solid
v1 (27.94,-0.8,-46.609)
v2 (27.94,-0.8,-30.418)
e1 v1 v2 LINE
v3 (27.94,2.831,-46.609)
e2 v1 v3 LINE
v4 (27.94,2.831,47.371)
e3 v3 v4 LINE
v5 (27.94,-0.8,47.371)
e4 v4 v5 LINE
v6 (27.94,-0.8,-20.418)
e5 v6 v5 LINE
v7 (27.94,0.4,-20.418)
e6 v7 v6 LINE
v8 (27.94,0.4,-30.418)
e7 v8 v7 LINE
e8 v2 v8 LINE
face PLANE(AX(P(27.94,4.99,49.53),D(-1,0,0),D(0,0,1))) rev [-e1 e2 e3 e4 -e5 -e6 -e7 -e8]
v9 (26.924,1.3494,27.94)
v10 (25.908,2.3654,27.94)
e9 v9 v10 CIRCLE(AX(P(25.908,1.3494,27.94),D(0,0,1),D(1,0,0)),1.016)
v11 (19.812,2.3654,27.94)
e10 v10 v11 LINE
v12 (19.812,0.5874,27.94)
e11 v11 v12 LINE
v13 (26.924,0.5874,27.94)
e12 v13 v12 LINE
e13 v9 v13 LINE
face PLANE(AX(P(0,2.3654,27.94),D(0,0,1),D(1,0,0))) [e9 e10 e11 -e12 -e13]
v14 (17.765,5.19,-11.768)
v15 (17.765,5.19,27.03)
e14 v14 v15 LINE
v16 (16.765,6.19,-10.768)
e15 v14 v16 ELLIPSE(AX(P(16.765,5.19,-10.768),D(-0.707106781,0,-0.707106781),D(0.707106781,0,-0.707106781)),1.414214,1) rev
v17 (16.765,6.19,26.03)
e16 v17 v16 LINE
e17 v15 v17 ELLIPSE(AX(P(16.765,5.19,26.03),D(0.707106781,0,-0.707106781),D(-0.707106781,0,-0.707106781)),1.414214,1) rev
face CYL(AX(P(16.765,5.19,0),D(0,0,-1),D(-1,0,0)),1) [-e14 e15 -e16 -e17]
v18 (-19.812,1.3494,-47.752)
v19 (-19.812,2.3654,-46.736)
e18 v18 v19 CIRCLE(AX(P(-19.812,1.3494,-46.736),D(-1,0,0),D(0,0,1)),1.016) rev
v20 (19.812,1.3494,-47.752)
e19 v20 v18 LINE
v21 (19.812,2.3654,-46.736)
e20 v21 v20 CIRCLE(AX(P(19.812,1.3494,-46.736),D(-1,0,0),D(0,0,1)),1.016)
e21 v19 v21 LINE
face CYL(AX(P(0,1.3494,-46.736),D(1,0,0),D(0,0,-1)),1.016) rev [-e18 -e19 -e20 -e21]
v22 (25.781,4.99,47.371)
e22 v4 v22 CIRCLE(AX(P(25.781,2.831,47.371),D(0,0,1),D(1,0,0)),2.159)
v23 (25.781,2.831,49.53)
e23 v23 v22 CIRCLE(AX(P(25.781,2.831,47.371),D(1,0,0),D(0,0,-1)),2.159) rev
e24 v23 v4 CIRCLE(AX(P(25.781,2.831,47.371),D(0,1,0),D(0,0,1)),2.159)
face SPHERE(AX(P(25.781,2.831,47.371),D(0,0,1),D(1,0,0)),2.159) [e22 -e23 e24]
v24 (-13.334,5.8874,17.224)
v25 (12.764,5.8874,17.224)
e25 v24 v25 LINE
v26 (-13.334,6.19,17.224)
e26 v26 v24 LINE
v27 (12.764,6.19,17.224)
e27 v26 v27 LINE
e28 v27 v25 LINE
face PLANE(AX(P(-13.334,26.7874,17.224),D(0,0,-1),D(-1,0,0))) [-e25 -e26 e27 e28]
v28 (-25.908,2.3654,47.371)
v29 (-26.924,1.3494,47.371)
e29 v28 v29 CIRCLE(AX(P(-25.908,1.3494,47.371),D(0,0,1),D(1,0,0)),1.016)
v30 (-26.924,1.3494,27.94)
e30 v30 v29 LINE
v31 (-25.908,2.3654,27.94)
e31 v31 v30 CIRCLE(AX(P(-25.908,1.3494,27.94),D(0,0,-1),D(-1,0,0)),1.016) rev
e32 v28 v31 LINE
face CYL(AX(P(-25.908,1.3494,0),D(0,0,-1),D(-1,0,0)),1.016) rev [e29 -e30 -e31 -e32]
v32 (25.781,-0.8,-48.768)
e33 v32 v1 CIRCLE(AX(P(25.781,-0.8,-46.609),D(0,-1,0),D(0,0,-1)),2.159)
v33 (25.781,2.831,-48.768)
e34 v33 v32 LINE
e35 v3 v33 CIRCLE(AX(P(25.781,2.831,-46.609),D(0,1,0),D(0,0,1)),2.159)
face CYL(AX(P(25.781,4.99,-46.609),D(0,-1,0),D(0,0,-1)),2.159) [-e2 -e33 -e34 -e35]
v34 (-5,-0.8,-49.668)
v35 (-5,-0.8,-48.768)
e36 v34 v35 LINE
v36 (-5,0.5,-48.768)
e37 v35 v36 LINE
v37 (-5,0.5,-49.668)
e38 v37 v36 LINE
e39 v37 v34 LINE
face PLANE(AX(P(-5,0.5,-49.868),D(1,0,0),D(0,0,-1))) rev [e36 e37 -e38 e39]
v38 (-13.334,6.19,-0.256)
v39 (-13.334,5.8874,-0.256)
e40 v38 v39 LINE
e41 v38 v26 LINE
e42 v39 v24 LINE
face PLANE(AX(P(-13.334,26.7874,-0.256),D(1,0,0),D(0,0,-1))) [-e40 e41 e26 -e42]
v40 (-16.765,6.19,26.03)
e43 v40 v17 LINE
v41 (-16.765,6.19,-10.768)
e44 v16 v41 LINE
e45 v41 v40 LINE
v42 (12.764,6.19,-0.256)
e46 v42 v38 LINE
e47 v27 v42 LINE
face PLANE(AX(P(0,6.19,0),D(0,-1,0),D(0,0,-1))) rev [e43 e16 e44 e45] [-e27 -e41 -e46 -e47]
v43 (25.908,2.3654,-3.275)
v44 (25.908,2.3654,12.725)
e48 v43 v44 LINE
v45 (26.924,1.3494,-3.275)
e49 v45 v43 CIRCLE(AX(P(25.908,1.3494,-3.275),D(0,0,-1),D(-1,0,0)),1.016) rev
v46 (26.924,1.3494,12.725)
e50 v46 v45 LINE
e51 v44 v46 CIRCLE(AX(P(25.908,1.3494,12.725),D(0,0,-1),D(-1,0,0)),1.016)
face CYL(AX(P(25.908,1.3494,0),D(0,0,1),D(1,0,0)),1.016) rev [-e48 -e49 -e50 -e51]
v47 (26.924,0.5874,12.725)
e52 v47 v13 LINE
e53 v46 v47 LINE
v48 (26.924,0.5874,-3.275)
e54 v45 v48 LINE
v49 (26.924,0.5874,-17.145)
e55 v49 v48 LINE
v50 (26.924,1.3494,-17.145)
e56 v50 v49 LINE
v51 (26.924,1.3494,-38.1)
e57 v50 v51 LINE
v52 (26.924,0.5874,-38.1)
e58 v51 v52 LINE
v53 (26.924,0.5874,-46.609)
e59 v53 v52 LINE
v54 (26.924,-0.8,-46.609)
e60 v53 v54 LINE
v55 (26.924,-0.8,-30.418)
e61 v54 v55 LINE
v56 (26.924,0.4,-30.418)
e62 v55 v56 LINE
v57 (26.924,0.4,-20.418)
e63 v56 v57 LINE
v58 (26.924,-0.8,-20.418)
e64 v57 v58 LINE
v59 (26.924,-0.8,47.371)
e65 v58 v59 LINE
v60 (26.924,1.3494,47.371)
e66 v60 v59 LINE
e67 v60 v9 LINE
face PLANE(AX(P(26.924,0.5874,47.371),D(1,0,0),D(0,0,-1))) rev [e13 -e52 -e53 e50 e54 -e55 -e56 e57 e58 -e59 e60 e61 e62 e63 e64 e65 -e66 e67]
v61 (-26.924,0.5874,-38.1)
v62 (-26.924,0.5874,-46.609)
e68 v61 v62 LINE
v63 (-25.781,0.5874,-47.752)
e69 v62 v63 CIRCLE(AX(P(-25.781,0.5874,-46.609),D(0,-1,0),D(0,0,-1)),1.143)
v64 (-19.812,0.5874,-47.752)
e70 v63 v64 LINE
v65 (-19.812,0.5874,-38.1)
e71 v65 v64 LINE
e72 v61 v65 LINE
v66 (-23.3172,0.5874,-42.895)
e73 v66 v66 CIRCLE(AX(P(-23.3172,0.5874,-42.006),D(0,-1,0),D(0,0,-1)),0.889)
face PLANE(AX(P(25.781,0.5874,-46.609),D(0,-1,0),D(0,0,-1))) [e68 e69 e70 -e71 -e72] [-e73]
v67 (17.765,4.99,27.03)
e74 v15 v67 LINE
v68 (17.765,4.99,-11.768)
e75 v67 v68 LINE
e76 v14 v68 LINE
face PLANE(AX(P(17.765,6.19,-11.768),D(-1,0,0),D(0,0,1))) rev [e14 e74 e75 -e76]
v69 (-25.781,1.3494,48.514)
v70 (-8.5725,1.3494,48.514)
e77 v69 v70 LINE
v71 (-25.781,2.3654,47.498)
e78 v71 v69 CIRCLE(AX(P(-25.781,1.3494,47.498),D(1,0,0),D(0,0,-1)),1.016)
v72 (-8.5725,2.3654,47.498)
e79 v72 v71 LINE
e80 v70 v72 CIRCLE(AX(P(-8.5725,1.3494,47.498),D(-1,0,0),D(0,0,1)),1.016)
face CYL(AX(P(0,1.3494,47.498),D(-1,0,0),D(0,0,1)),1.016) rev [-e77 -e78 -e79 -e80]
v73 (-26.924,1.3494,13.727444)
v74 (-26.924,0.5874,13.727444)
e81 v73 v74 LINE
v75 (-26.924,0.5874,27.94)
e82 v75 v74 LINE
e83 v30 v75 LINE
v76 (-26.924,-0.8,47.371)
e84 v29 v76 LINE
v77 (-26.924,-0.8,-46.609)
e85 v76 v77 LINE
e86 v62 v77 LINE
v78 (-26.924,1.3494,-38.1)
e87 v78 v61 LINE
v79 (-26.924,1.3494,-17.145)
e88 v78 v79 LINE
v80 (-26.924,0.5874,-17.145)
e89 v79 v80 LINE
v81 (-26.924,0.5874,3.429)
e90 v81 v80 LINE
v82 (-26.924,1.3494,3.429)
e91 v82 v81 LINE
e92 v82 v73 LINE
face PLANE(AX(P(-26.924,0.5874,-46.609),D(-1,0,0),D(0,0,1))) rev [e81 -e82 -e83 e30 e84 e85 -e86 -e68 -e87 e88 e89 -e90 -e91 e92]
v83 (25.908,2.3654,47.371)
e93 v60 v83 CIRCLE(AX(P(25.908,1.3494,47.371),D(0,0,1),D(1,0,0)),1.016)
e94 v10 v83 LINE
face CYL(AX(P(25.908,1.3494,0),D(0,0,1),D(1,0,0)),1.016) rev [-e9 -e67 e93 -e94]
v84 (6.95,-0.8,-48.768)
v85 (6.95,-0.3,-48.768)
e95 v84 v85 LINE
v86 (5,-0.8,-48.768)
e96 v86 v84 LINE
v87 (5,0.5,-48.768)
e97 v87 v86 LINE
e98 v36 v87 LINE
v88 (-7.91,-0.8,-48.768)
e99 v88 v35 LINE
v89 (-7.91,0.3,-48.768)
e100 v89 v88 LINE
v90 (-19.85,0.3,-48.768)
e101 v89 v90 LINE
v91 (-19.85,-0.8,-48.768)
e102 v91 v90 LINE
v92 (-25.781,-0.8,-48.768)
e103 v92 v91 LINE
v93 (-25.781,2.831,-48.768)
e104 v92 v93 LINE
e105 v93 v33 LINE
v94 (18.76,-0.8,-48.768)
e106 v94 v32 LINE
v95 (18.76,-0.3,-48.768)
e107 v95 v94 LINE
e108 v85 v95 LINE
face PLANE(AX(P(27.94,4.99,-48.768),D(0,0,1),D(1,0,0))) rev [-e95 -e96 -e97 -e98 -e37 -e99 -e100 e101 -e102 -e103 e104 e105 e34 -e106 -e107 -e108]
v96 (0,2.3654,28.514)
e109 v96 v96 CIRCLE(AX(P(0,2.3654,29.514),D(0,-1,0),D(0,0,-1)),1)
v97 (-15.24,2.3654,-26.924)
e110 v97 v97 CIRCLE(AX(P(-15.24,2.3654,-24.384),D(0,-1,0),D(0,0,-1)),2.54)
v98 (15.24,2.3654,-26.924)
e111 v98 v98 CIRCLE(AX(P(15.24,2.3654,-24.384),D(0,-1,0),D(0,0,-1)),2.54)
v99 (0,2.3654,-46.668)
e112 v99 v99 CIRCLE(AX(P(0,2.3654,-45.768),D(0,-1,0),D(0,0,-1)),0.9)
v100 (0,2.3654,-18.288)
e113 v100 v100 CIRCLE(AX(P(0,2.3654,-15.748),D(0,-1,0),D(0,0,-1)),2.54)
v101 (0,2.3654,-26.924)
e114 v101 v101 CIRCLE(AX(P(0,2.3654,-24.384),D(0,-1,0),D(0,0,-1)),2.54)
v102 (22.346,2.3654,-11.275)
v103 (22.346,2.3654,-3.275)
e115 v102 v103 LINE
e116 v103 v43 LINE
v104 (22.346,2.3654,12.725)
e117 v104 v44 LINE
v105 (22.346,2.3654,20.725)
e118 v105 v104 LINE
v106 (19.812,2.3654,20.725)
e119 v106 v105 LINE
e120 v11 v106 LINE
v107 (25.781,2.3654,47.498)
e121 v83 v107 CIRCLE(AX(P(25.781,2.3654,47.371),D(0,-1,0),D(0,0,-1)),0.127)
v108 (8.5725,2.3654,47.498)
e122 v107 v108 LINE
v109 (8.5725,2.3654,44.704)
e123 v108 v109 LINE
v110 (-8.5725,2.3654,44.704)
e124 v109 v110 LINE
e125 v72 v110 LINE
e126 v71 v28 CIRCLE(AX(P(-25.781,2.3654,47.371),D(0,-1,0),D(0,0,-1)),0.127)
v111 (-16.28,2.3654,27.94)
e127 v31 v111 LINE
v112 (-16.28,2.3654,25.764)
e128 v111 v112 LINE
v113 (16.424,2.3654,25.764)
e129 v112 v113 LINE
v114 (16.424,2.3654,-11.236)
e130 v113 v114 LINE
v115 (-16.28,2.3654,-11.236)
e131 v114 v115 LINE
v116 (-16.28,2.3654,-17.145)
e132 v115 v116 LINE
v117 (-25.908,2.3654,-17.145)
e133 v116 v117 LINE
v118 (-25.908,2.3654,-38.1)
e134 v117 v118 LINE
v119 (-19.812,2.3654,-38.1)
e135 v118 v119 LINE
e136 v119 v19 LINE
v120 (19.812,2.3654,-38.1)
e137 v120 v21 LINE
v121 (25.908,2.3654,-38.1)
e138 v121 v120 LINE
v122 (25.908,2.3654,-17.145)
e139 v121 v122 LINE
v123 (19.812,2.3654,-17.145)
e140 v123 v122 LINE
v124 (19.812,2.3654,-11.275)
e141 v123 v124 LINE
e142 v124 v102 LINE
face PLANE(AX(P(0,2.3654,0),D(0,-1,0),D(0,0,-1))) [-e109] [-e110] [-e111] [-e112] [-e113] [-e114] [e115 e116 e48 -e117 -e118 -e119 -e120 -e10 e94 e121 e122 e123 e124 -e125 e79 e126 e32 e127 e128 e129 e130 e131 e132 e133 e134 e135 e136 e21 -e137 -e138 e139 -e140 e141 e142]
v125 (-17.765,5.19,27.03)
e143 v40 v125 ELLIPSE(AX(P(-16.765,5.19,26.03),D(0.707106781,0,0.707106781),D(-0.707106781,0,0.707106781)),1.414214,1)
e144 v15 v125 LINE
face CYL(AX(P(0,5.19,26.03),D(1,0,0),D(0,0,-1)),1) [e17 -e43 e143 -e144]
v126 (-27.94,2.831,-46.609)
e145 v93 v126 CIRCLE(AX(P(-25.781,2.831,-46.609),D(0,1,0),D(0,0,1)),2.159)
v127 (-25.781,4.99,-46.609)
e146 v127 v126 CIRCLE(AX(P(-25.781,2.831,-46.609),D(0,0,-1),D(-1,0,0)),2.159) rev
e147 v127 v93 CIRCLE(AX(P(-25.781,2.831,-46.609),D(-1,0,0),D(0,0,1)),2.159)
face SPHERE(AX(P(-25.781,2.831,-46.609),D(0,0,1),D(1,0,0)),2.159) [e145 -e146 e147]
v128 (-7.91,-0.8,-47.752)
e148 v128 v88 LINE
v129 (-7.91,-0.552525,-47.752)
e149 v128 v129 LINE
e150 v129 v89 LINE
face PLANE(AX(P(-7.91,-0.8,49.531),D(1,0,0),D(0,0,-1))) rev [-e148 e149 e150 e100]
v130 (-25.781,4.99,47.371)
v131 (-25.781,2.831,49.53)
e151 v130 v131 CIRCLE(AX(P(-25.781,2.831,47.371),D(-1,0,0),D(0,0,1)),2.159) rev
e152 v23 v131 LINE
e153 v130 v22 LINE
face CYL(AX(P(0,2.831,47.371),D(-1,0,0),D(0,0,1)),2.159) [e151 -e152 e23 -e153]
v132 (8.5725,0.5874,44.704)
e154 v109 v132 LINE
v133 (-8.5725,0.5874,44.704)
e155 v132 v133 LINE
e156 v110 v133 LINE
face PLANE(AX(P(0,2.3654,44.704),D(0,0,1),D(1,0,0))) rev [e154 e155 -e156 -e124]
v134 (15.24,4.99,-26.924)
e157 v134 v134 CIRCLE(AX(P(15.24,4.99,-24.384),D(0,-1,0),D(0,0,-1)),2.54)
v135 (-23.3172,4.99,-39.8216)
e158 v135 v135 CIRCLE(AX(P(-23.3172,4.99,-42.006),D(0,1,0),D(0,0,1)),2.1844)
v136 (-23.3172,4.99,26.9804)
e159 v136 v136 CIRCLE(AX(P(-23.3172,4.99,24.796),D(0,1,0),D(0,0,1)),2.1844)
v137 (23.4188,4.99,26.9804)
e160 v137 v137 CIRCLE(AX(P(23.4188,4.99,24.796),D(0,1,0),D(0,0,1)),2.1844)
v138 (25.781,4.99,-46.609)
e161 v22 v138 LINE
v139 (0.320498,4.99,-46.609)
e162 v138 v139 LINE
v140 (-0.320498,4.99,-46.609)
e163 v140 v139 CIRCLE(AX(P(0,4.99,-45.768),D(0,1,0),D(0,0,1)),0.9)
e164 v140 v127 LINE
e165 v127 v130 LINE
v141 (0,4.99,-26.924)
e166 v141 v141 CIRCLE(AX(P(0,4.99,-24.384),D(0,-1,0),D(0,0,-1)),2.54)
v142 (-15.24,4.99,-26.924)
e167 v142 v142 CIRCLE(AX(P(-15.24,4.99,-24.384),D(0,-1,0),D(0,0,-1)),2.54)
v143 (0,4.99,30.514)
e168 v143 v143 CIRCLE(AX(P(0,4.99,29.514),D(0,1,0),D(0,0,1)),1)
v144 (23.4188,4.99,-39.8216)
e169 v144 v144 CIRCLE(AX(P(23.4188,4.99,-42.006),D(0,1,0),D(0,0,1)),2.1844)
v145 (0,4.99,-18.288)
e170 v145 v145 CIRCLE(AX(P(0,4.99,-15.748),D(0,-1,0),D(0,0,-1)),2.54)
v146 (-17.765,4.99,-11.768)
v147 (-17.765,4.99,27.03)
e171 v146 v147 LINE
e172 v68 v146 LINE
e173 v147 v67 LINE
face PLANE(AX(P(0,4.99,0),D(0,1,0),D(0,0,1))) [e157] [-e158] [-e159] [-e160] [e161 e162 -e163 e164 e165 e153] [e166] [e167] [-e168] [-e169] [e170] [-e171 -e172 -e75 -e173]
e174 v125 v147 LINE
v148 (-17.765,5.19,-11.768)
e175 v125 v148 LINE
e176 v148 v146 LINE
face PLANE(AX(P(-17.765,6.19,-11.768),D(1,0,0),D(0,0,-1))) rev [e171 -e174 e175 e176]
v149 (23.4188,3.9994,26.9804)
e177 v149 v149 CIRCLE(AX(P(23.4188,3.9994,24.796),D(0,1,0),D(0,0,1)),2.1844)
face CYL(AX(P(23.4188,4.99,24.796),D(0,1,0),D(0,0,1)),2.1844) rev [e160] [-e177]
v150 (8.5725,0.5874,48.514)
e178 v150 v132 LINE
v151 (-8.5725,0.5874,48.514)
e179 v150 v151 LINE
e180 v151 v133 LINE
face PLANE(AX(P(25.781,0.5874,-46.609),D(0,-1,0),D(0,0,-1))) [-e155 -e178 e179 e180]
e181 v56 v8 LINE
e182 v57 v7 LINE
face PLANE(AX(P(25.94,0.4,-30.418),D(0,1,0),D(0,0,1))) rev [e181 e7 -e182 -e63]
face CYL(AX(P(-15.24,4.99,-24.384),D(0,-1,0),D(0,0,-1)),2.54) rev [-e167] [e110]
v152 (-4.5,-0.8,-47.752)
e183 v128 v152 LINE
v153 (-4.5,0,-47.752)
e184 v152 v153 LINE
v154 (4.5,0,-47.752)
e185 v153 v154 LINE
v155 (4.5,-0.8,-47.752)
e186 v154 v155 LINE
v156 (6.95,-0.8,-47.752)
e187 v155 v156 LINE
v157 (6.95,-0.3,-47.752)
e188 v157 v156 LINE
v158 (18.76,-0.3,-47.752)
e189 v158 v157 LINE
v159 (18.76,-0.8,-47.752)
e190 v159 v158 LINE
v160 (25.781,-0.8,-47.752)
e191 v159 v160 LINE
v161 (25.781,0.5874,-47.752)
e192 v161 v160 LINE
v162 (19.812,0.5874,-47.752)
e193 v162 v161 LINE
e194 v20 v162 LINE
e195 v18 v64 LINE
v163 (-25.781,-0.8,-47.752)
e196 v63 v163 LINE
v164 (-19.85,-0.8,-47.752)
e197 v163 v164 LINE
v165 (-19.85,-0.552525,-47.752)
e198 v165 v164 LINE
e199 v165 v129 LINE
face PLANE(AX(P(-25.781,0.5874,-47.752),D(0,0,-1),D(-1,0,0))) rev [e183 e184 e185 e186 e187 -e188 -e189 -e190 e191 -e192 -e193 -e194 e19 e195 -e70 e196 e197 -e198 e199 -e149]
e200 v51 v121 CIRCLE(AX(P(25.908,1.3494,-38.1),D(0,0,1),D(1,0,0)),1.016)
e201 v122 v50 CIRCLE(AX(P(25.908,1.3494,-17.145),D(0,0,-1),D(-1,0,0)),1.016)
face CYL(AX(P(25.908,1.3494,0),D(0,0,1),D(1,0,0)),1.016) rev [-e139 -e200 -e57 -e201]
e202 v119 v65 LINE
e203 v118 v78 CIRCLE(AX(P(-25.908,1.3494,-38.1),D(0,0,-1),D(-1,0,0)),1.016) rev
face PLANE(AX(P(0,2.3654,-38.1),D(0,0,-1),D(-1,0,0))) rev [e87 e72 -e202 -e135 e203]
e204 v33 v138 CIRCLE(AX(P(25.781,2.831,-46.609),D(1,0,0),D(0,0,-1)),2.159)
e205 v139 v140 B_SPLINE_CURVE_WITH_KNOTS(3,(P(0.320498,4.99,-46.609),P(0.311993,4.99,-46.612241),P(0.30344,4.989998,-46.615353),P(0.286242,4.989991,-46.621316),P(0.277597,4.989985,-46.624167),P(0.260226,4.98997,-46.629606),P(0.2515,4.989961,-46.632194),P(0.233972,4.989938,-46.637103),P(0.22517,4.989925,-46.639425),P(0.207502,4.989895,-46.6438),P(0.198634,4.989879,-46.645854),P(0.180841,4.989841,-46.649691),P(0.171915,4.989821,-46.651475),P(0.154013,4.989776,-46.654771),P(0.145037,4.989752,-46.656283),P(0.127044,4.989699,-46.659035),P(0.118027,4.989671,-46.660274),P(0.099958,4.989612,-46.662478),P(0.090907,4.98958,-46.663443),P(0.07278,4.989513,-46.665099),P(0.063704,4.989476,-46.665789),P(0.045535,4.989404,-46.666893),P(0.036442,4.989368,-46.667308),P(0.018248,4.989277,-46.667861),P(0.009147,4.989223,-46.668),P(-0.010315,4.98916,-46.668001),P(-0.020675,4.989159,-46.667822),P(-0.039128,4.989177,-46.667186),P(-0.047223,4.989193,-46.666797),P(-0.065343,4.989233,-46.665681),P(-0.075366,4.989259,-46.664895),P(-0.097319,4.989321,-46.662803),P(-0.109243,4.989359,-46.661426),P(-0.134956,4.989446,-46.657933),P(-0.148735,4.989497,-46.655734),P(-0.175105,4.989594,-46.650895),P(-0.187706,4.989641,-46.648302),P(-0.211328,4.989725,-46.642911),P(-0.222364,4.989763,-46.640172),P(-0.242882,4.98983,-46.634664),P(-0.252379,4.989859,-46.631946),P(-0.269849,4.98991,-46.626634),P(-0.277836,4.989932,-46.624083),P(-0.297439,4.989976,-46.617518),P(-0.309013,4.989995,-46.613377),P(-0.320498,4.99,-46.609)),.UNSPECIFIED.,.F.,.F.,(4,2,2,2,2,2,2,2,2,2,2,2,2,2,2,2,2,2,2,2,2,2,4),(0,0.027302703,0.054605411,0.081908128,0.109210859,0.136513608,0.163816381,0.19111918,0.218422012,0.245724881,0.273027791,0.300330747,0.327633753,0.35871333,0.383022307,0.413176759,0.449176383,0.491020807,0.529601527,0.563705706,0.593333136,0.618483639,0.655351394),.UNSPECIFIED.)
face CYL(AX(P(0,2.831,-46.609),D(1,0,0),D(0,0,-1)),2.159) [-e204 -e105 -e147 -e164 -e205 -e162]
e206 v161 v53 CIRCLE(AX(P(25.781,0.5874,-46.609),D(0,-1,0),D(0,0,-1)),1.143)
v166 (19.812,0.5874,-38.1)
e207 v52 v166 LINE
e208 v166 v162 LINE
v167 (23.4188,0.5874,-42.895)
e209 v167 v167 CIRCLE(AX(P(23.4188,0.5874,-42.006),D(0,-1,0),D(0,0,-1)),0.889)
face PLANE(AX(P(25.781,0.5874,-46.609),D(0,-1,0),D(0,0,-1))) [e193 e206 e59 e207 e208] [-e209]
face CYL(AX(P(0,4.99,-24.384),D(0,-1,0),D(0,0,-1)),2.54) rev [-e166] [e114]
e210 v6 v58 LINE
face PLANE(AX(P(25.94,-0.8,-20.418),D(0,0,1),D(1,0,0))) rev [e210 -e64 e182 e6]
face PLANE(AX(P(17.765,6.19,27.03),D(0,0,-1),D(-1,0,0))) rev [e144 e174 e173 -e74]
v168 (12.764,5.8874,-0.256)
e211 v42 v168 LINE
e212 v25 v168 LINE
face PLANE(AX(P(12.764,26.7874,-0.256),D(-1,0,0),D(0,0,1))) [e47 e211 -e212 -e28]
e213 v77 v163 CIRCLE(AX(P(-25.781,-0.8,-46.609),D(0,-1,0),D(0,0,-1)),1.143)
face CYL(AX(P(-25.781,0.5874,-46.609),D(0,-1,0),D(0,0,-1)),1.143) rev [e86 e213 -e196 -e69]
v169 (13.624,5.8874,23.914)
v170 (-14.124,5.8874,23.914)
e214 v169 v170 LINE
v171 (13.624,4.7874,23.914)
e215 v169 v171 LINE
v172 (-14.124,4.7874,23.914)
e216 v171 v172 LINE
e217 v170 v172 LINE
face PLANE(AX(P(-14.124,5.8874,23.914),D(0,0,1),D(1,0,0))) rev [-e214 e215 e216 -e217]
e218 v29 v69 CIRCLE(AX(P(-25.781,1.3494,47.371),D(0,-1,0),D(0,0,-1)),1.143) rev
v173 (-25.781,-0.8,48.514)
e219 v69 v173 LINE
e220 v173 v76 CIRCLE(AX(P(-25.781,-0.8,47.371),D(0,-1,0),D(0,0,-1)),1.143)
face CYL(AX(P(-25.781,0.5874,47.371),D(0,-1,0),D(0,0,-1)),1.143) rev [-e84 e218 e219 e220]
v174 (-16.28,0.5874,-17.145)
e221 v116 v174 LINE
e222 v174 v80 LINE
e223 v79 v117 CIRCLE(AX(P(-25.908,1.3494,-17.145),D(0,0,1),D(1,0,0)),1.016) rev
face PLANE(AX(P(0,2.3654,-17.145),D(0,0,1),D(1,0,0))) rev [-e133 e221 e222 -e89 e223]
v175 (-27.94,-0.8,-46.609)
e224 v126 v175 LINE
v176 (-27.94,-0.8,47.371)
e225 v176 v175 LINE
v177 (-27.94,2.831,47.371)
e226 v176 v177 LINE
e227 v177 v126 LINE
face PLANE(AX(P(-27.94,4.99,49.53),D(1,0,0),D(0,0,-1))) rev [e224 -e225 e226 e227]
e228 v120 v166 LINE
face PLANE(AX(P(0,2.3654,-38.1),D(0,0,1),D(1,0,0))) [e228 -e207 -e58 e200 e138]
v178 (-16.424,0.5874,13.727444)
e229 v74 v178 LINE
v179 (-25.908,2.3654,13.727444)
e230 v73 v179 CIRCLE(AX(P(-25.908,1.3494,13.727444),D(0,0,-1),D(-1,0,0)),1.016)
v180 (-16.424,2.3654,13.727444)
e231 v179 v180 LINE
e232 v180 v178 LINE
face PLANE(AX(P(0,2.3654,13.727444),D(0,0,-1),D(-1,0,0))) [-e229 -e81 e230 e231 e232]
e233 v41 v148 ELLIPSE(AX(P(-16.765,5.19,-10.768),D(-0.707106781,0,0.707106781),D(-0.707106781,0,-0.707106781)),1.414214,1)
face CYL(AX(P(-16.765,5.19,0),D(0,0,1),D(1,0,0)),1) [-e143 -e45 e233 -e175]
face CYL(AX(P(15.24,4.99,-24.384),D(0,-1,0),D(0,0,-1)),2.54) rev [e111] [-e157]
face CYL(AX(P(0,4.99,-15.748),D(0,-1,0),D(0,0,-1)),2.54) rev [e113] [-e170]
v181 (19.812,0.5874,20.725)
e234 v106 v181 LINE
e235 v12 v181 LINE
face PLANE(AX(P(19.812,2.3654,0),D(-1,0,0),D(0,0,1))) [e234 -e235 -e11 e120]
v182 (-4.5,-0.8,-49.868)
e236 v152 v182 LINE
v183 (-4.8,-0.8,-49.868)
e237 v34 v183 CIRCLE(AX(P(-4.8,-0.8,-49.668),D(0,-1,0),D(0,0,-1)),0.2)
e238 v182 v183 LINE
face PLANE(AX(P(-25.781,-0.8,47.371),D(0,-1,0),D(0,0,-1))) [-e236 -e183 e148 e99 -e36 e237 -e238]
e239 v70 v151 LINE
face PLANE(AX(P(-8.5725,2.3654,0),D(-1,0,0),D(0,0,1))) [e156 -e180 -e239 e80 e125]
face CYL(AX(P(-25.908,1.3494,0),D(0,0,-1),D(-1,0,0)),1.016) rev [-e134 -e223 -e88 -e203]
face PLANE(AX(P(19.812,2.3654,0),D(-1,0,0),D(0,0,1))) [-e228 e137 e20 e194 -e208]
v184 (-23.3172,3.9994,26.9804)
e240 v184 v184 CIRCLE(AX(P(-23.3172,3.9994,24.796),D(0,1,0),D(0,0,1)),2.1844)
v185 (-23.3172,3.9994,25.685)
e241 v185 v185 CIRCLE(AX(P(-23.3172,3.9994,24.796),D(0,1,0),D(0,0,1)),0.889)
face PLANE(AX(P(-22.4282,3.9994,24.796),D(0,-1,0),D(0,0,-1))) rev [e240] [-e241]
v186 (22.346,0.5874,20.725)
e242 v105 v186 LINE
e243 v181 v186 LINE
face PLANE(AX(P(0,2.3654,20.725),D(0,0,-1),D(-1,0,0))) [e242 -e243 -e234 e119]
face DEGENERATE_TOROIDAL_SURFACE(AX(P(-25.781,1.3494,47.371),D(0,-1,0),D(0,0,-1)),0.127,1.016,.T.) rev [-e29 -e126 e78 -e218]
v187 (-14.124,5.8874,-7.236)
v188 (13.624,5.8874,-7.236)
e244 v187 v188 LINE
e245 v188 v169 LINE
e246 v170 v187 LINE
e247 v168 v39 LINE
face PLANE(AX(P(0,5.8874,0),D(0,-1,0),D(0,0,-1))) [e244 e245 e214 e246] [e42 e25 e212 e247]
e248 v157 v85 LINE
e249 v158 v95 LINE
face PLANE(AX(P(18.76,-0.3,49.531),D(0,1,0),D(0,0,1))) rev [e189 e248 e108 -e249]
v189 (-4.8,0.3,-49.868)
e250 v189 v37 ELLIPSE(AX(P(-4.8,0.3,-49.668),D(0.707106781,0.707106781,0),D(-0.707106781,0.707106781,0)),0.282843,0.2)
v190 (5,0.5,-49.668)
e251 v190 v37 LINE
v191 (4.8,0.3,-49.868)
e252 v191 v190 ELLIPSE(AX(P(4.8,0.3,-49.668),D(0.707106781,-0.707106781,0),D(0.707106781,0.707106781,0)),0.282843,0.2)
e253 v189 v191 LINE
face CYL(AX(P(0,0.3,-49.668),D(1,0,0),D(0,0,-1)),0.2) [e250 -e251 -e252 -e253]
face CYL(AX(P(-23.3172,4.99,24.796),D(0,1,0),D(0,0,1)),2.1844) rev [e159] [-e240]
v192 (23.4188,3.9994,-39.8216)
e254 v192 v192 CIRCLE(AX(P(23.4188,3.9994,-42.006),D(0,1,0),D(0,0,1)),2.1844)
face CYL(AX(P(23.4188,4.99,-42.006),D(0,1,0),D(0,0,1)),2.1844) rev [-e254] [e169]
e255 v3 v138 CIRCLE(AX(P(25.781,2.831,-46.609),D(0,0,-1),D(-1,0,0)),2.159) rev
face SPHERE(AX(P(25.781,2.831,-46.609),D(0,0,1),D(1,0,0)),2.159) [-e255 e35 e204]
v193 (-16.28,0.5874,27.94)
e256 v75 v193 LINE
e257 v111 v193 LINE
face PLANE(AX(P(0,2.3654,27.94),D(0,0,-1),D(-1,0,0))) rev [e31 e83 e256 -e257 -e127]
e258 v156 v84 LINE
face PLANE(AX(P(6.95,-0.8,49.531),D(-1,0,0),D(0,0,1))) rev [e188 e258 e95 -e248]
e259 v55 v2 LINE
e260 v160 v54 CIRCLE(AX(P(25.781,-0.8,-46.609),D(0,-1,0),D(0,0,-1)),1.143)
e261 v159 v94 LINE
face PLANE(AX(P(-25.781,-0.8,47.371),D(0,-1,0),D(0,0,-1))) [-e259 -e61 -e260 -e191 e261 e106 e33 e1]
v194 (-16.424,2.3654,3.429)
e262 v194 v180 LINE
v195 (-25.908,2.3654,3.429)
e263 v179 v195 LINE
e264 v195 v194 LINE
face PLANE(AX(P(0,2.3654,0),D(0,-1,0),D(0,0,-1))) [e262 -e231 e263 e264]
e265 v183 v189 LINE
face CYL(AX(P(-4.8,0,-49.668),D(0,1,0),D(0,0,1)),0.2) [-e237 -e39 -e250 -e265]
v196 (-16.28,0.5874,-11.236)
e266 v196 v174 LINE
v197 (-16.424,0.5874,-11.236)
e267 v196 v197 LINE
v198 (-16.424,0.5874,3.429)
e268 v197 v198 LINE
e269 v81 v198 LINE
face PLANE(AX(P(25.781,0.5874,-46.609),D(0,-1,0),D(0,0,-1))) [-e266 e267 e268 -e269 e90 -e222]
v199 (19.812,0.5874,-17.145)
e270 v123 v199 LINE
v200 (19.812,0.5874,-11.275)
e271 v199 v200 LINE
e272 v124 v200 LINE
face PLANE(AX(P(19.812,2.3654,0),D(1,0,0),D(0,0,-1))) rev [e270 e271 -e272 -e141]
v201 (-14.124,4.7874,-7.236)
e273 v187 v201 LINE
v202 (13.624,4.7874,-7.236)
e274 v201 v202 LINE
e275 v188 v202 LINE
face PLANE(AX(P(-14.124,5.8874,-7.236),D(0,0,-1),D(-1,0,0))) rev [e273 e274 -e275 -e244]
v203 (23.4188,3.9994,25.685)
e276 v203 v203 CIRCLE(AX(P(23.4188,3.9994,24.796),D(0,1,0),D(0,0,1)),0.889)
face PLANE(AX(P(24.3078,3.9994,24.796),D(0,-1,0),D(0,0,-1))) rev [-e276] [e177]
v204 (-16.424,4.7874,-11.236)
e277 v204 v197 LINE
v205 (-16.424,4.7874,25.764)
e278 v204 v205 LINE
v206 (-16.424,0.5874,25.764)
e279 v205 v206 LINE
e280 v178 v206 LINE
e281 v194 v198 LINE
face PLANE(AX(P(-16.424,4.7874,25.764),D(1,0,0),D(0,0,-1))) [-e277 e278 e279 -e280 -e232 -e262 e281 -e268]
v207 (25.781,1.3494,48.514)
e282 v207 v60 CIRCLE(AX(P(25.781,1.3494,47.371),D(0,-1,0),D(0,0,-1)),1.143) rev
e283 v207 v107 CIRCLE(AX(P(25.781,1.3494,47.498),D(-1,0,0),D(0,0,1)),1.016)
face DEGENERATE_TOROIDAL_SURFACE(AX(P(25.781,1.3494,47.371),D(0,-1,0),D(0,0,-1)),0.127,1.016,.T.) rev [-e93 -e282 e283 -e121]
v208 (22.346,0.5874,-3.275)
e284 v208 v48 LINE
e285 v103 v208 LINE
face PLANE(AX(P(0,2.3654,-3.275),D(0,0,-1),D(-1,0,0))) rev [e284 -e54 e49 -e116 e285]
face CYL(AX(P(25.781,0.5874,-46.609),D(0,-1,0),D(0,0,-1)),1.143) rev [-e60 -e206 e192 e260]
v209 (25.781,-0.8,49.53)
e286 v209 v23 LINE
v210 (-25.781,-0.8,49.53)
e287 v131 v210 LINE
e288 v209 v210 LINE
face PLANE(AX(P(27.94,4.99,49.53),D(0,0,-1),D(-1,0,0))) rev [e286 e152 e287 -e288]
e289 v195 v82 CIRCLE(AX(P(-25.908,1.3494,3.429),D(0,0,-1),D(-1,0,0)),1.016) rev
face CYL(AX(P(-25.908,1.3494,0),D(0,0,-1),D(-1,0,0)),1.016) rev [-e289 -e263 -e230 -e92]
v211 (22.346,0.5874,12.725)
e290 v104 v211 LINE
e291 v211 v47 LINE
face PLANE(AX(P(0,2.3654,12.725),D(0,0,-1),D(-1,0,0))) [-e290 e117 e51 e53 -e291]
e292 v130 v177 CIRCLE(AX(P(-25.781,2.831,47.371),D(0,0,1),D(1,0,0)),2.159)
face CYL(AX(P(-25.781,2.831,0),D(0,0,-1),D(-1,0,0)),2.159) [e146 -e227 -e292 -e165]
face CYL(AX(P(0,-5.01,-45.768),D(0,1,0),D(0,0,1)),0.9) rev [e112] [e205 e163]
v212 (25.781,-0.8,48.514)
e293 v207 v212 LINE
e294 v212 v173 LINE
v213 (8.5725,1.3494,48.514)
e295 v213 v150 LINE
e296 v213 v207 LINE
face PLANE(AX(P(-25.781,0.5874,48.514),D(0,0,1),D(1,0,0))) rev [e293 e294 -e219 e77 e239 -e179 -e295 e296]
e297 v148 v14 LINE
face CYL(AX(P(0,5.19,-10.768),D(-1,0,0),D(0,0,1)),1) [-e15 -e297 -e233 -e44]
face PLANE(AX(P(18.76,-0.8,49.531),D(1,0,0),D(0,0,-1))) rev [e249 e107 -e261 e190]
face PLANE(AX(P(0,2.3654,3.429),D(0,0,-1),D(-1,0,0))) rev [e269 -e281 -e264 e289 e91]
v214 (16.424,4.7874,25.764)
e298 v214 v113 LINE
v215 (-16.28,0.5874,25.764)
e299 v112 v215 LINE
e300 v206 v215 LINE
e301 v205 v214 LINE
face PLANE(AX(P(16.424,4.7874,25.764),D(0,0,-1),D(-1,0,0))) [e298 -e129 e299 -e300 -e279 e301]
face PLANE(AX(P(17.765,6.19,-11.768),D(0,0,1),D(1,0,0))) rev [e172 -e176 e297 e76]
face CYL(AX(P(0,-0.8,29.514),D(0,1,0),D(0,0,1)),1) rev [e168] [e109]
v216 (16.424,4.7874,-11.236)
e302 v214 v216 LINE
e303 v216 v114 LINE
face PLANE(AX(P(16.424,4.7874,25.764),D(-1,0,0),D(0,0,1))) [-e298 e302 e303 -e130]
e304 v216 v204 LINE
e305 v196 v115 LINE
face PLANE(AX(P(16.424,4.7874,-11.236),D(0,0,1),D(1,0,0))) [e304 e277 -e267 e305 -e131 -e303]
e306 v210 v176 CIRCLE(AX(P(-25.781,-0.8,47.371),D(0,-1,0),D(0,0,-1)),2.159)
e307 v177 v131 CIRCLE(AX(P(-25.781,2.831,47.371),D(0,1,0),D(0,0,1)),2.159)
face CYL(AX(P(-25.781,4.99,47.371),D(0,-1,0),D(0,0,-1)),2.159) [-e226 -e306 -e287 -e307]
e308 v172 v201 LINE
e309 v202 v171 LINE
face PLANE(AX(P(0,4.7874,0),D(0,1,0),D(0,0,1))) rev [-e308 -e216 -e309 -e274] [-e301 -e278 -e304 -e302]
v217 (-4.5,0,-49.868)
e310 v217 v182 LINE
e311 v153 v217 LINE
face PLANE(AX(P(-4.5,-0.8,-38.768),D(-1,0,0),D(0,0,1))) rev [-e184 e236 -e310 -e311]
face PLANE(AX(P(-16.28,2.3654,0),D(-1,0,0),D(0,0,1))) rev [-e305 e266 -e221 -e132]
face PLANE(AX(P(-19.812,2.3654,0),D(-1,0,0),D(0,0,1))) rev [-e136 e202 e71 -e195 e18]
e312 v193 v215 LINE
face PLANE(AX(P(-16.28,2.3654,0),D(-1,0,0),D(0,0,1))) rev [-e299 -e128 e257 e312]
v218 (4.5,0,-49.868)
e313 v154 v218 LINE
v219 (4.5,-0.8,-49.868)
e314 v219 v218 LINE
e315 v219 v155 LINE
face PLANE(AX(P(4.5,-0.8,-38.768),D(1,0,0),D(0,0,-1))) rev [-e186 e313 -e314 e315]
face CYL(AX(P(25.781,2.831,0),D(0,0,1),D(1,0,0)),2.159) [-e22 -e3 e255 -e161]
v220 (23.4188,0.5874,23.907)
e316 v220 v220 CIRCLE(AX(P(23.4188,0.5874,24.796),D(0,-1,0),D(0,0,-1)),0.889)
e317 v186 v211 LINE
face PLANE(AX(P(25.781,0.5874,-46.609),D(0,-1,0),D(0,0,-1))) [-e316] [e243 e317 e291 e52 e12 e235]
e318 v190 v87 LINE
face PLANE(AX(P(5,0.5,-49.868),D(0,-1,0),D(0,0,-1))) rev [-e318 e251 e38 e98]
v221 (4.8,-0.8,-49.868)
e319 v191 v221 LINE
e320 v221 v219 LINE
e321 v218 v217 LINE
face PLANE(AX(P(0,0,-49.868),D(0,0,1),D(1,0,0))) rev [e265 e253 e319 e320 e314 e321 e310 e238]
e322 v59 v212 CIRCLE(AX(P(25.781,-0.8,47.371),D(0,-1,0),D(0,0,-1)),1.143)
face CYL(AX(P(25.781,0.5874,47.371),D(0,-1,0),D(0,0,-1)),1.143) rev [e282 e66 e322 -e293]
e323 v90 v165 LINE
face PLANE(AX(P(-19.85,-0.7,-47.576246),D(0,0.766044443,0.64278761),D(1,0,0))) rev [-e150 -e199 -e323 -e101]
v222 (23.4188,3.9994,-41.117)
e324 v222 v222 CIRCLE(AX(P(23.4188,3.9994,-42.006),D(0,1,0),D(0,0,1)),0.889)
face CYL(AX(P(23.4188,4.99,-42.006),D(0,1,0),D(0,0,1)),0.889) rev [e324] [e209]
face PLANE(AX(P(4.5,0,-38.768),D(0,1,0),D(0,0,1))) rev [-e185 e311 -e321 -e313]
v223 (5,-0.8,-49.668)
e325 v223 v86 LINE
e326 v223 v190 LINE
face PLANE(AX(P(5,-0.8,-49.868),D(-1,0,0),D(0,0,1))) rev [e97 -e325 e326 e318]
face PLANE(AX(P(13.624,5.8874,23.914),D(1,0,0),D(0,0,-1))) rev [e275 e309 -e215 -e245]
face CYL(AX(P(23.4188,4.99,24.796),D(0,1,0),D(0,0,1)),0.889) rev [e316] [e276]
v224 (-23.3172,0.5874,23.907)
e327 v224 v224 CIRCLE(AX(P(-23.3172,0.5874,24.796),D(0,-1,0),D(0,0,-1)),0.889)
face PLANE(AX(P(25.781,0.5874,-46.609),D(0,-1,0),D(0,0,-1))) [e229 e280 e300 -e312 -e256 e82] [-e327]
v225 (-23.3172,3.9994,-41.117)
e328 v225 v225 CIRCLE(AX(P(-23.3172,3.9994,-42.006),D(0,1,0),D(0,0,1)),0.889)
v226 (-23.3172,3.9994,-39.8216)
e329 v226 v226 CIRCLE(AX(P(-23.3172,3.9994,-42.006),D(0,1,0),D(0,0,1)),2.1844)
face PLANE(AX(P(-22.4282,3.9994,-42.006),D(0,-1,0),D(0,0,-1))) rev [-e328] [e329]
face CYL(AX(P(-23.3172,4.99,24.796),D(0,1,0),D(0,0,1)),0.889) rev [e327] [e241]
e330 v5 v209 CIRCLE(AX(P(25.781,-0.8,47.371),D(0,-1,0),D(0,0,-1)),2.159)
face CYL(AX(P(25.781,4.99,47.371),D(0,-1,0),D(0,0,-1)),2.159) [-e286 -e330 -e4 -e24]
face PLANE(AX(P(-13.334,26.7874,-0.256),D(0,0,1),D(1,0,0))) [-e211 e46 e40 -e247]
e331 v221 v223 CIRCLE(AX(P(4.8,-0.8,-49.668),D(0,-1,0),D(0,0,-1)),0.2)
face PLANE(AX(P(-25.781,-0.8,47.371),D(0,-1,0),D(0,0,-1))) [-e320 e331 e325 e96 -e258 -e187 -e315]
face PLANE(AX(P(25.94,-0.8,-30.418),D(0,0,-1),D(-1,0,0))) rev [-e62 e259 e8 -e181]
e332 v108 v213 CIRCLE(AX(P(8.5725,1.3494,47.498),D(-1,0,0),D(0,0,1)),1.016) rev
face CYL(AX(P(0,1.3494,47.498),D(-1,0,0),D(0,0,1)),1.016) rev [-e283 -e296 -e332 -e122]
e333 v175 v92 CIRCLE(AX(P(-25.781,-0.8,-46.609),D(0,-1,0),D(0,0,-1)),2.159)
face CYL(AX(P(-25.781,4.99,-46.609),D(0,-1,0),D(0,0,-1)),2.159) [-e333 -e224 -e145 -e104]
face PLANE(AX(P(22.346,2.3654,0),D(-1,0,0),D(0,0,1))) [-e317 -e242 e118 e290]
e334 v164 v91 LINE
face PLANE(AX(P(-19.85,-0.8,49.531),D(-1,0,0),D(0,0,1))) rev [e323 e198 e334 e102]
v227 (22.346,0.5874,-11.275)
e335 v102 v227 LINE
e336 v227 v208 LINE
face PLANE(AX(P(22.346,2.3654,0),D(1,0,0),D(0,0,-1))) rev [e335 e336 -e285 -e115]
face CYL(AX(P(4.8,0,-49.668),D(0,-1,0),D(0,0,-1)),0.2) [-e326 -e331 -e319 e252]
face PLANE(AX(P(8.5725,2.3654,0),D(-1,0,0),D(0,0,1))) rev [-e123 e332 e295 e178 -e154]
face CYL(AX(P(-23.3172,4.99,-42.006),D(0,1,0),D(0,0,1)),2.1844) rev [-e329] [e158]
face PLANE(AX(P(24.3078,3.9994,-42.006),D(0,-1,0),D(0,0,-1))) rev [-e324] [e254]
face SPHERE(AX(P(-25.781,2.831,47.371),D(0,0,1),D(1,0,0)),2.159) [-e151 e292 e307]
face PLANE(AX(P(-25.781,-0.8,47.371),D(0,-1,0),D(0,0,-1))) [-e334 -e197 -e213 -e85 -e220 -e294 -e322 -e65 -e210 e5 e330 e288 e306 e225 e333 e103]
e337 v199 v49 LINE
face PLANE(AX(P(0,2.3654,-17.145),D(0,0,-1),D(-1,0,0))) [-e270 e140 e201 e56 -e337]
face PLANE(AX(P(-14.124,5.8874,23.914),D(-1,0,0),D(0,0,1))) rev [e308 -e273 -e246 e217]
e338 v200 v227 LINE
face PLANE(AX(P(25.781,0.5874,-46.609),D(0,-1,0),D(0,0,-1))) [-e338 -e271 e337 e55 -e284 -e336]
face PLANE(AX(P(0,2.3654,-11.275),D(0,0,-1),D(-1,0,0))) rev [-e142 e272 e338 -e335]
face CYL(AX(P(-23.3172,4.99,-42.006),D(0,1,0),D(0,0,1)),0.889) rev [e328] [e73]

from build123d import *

# Parameters (mm, degrees)
SKETCH1_W                                        = 55.88
SKETCH1_H                                        = 98.298
BOSS_EXTRUDE1_DEPTH                              = 4.99
FILLET1_R                                        = 2.159
CUT_EXTRUDE4_DEPTH                               = 0.5874
CUT_EXTRUDE5_DEPTH                               = 1.778
FILLET4_R                                        = 1.016
CHAMBRAGE_POUR_VIS_T_TE_RONDE_6_PANS_D           = 1.778
CHAMBRAGE_POUR_VIS_T_TE_RONDE_6_PANS_DEPTH       = 6
CHAMBRAGE_POUR_VIS_T_TE_RONDE_6_PANS_CBORE_D     = 4.3688
CHAMBRAGE_POUR_VIS_T_TE_RONDE_6_PANS_CBORE_DEPTH = 0.9906
CHAMBRAGE_POUR_VIS_T_TE_RONDE_6_PANS_TIP         = 0.53416509
SKETCH15_R                                       = 2.54
CUT_EXTRUDE6_DEPTH                               = 57.927612151
SKETCH16_W                                       = 32.848
SKETCH16_H                                       = 37
CUT_EXTRUDE7_DEPTH                               = 4.2
BOSS_EXTRUDE2_DEPTH                              = 0.8
ESQUISSE19_W                                     = 35.53
ESQUISSE19_H                                     = 38.798
BOSS_EXTRU_2_DEPTH                               = 1.2
ESQUISSE1_R                                      = 1
ENL_V_MAT_EXTRU_1_DEPTH                          = 58.161075917
ESQUISSE5_W                                      = 10
ESQUISSE5_H                                      = 1.2
ENL_V_MAT_EXTRU_3_DEPTH                          = 2
ESQUISSE13_W                                     = 27.748
ESQUISSE13_H                                     = 31.15
ENL_V_MAT_EXTRU_6_DEPTH                          = 1.1
ESQUISSE14_R                                     = 0.9
ENL_V_MAT_EXTRU_7_DEPTH                          = 10
ENL_V_MAT_EXTRU_8_REACH                          = 104.379
ESQUISSE15_W                                     = 11.94
ESQUISSE15_H                                     = 0.1
CHANFREIN1_SIZE                                  = 1
CHANFREIN1_SIZE_2                                = 1.191753593
ENL_V_MAT_EXTRU_9_REACH                          = 104.379
ESQUISSE16_W                                     = 11.81
ESQUISSE16_H                                     = 0.5
ESQUISSE17_W                                     = 9
ESQUISSE17_H                                     = 0.8
ENL_V_MAT_EXTRU_10_DEPTH                         = 10
BOSS_EXTRU_1_DEPTH                               = 1.1
CONG_1_R                                         = 0.2
ESQUISSE12_W                                     = 26.098
ESQUISSE12_H                                     = 17.48
ENL_V_MAT_EXTRU_5_DEPTH                          = 22
CONG_2_R                                         = 1


with BuildPart() as part:
    # Sketch1 → Boss-Extrude1 (new body)
    with BuildSketch(Plane(origin=(0, 0, 0), x_dir=(1, 0, 0), z_dir=(0, 1, 0))):
        with Locations((0, -0.381)):
            Rectangle(SKETCH1_W, SKETCH1_H)
    extrude(amount=BOSS_EXTRUDE1_DEPTH)

    # Fillet1
    fillet1_edges = [part.edges().sort_by_distance(p)[0] for p in [
        (27.94, 4.99, 0.381),
        (0, 4.99, -48.768),
        (-27.94, 4.99, 0.381),
        (0, 4.99, 49.53),
        (-27.94, 2.495, -48.768),
        (27.94, 2.495, -48.768),
        (27.94, 2.495, 49.53),
        (-27.94, 2.495, 49.53),
    ]]
    fillet(fillet1_edges, radius=FILLET1_R)

    # Sketch7 → Cut-Extrude4 (cut)
    with BuildSketch(Plane.XZ):
        with BuildLine():
            Line((-25.781, -47.752), (25.781, -47.752))
            ThreePointArc((25.781, -47.752), (26.589223051, -47.417223051), (26.924, -46.609))
            Line((26.924, -46.609), (26.924, 47.371))
            ThreePointArc((26.924, 47.371), (26.589223051, 48.179223051), (25.781, 48.514))
            Line((25.781, 48.514), (-25.781, 48.514))
            ThreePointArc((-25.781, 48.514), (-26.589223051, 48.179223051), (-26.924, 47.371))
            Line((-26.924, 47.371), (-26.924, -46.609))
            ThreePointArc((-26.924, -46.609), (-26.589223051, -47.417223051), (-25.781, -47.752))
        make_face()
    extrude(amount=-CUT_EXTRUDE4_DEPTH, mode=Mode.SUBTRACT)

    # Sketch12 → Cut-Extrude5 (cut)
    with BuildSketch(Plane.XZ.offset(-0.5874)):
        with BuildLine():
            Line((19.812, -38.1), (26.924, -38.1))
            Line((26.924, -38.1), (26.924, -17.145))
            Line((26.924, -17.145), (19.812, -17.145))
            Line((19.812, -17.145), (19.812, -11.275000024))
            Line((19.812, -11.275000024), (22.346000012, -11.275000024))
            Line((22.346000012, -11.275000024), (22.346000012, -3.275))
            Line((22.346000012, -3.275), (26.924, -3.275))
            Line((26.924, -3.275), (26.924, 12.725))
            Line((26.924, 12.725), (22.346000012, 12.725))
            Line((22.346000012, 12.725), (22.346000012, 20.725))
            Line((22.346000012, 20.725), (19.812, 20.725))
            Line((19.812, 20.725), (19.812, 27.94))
            Line((19.812, 27.94), (26.924, 27.94))
            Line((26.924, 27.94), (26.924, 47.371))
            ThreePointArc((26.924, 47.371), (26.589223051, 48.179223051), (25.781, 48.514))
            Line((25.781, 48.514), (8.5725, 48.514))
            Line((8.5725, 48.514), (8.5725, 44.704))
            Line((8.5725, 44.704), (-8.5725, 44.704))
            Line((-8.5725, 44.704), (-8.5725, 48.514))
            Line((-8.5725, 48.514), (-25.781, 48.514))
            ThreePointArc((-25.781, 48.514), (-26.589223051, 48.179223051), (-26.924, 47.371))
            Line((-26.924, 47.371), (-26.924, 27.94))
            Line((-26.924, 27.94), (-16.28, 27.94))
            Line((-16.28, 27.94), (-16.28, 13.727444148))
            Line((-16.28, 13.727444148), (-26.924, 13.727444148))
            Line((-26.924, 13.727444148), (-26.924, 3.429))
            Line((-26.924, 3.429), (-16.28, 3.429))
            Line((-16.28, 3.429), (-16.28, -17.145))
            Line((-16.28, -17.145), (-26.924, -17.145))
            Line((-26.924, -17.145), (-26.924, -38.1))
            Line((-26.924, -38.1), (-19.812, -38.1))
            Line((-19.812, -38.1), (-19.812, -47.752))
            Line((-19.812, -47.752), (19.812, -47.752))
            Line((19.812, -47.752), (19.812, -38.1))
        make_face()
    extrude(amount=-CUT_EXTRUDE5_DEPTH, mode=Mode.SUBTRACT)

    # Fillet4
    fillet4_edges = [part.edges().sort_by_distance(p)[0] for p in [
        (17.17675, 2.3654, 48.514),
        (26.589223051, 2.3654, 48.179223051),
        (26.924, 2.3654, 37.6555),
        (26.924, 2.3654, 4.725),
        (26.924, 2.3654, -27.6225),
        (0, 2.3654, -47.752),
        (-26.924, 2.3654, -27.6225),
        (-26.924, 2.3654, 8.578222074),
        (-26.924, 2.3654, 37.6555),
        (-26.589223051, 2.3654, 48.179223051),
        (-17.17675, 2.3654, 48.514),
    ]]
    fillet(fillet4_edges, radius=FILLET4_R)

    # Chambrage pour vis à tête ronde à 6 pans creux #11
    with Locations(Plane(origin=(0, 4.99, 0), x_dir=(1, 0, 0), z_dir=(0, 1, 0))):
        with Locations((-23.3172, -24.79600016), (23.4188, -24.79600016), (23.4188, 42.00599984), (-23.3172, 42.00599984)):
            CounterBoreHole(CHAMBRAGE_POUR_VIS_T_TE_RONDE_6_PANS_D / 2, CHAMBRAGE_POUR_VIS_T_TE_RONDE_6_PANS_CBORE_D / 2, CHAMBRAGE_POUR_VIS_T_TE_RONDE_6_PANS_CBORE_DEPTH, depth=CHAMBRAGE_POUR_VIS_T_TE_RONDE_6_PANS_DEPTH)
            with Locations((0, 0, -(CHAMBRAGE_POUR_VIS_T_TE_RONDE_6_PANS_DEPTH + CHAMBRAGE_POUR_VIS_T_TE_RONDE_6_PANS_TIP / 2))):  # 118° drill point
                Cone(0, CHAMBRAGE_POUR_VIS_T_TE_RONDE_6_PANS_D / 2, CHAMBRAGE_POUR_VIS_T_TE_RONDE_6_PANS_TIP, mode=Mode.SUBTRACT)

    # Sketch15 → Cut-Extrude6 (cut, through all)
    with BuildSketch(Plane.XZ.offset(-2.3654)):
        with Locations(Location((0, -24.384, 0), (0, 0, 270))):
            Circle(SKETCH15_R)
        with Locations(Location((-15.24, -24.384, 0), (0, 0, 270))):
            Circle(SKETCH15_R)
        with Locations(Location((15.24, -24.384, 0), (0, 0, 270))):
            Circle(SKETCH15_R)
        with Locations(Location((0, -15.748, 0), (0, 0, 270))):
            Circle(SKETCH15_R)
    extrude(amount=-CUT_EXTRUDE6_DEPTH, mode=Mode.SUBTRACT)

    # Sketch16 → Cut-Extrude7 (cut)
    with BuildSketch(Plane(origin=(0, 0.5874, 0), x_dir=(1, 0, 0), z_dir=(0, 1, 0))):
        with Locations((0, -7.264)):
            Rectangle(SKETCH16_W, SKETCH16_H)
    extrude(amount=CUT_EXTRUDE7_DEPTH, mode=Mode.SUBTRACT)

    # Sketch17 → Boss-Extrude2 (add)
    with BuildSketch(Plane.XZ):
        with BuildLine():
            Line((-27.94, 47.371), (-27.94, -46.609))
            ThreePointArc((-27.94, -46.609), (-27.307643541, -48.135643541), (-25.781, -48.768))
            Line((-25.781, -48.768), (25.781, -48.768))
            ThreePointArc((25.781, -48.768), (27.307643541, -48.135643541), (27.94, -46.609))
            Line((27.94, -46.609), (27.94, 47.371))
            ThreePointArc((27.94, 47.371), (27.307643541, 48.897643541), (25.781, 49.53))
            Line((25.781, 49.53), (-25.781, 49.53))
            ThreePointArc((-25.781, 49.53), (-27.307643541, 48.897643541), (-27.94, 47.371))
        make_face()
        with BuildLine():
            Line((-25.781, -47.752), (25.781, -47.752))
            ThreePointArc((25.781, -47.752), (26.589223051, -47.417223051), (26.924, -46.609))
            Line((26.924, -46.609), (26.924, 47.371))
            ThreePointArc((26.924, 47.371), (26.589223051, 48.179223051), (25.781, 48.514))
            Line((25.781, 48.514), (-25.781, 48.514))
            ThreePointArc((-25.781, 48.514), (-26.589223051, 48.179223051), (-26.924, 47.371))
            Line((-26.924, 47.371), (-26.924, -46.609))
            ThreePointArc((-26.924, -46.609), (-26.589223051, -47.417223051), (-25.781, -47.752))
        make_face(mode=Mode.SUBTRACT)
    extrude(amount=BOSS_EXTRUDE2_DEPTH)

    # Esquisse19 → Boss.-Extru.2 (add)
    with BuildSketch(Plane(origin=(0, 4.99, 0), x_dir=(1, 0, 0), z_dir=(0, 1, 0))):
        with Locations((0, -7.631)):
            Rectangle(ESQUISSE19_W, ESQUISSE19_H)
    extrude(amount=BOSS_EXTRU_2_DEPTH)

    # Esquisse1 → Enlèv. mat.-Extru.1 (cut, through all)
    with BuildSketch(Plane(origin=(0, 4.99, 0), x_dir=(1, 0, 0), z_dir=(0, 1, 0))):
        with Locations(Location((0, -29.514, 0), (0, 0, 270))):
            Circle(ESQUISSE1_R)
    extrude(amount=-ENL_V_MAT_EXTRU_1_DEPTH, mode=Mode.SUBTRACT)

    # Esquisse5 → Enlèv. mat.-Extru.3 (cut)
    with BuildSketch(Plane(origin=(27.94, 0, 0), x_dir=(0, 0, -1), z_dir=(1, 0, 0))):
        with Locations((25.418, -0.2)):
            Rectangle(ESQUISSE5_W, ESQUISSE5_H)
    extrude(amount=-ENL_V_MAT_EXTRU_3_DEPTH, mode=Mode.SUBTRACT)

    # Esquisse13 → Enlèv. mat.-Extru.6 (cut)
    with BuildSketch(Plane.XZ.offset(-4.7874)):
        with Locations((-0.25, 8.339)):
            Rectangle(ESQUISSE13_W, ESQUISSE13_H)
    extrude(amount=-ENL_V_MAT_EXTRU_6_DEPTH, mode=Mode.SUBTRACT)

    # Esquisse14 → Enlèv. mat.-Extru.7 (cut)
    with BuildSketch(Plane(origin=(0, 4.99, 0), x_dir=(1, 0, 0), z_dir=(0, 1, 0))):
        with Locations(Location((0, 45.768, 0), (0, 0, 110.861424329))):
            Circle(ESQUISSE14_R)
    extrude(amount=-ENL_V_MAT_EXTRU_7_DEPTH, mode=Mode.SUBTRACT)

    # Esquisse15 → Enlèv. mat.-Extru.8 (cut, up to next)
    with BuildSketch(Plane(origin=(0, 0, -48.768), x_dir=(-1, 0, 0), z_dir=(0, 0, -1)), mode=Mode.PRIVATE) as enl_v_mat_extru_8_sk1:
        with Locations((13.88, -0.75)):
            Rectangle(ESQUISSE15_W, ESQUISSE15_H)
    enl_v_mat_extru_8_tool1 = extrude(enl_v_mat_extru_8_sk1.sketch, amount=-ENL_V_MAT_EXTRU_8_REACH, mode=Mode.PRIVATE) & part.part
    add(enl_v_mat_extru_8_tool1.solids().sort_by_distance((-13.88, -0.75, -48.768))[0], mode=Mode.SUBTRACT)

    # Chanfrein1
    # the kernel refuses this chamfer: 1.191753593, 1 mm, written as the material it takes off along each edge
    with BuildSketch(Plane(origin=(-7.91, -0.7, -48.768), x_dir=(0, 0.9993728857116145, -0.03540953691366555), z_dir=(-1, 0, 0))) as chanfrein1_piece_1:
        Polygon((CHANFREIN1_SIZE * 0.999372885712, -CHANFREIN1_SIZE * 0.0354095369137), (-CHANFREIN1_SIZE_2 * 0.0354095369016, -CHANFREIN1_SIZE_2 * 0.999372885371), (0, 0), align=None)
    extrude(amount=11.94, mode=Mode.SUBTRACT)

    # Esquisse16 → Enlèv. mat.-Extru.9 (cut, up to next)
    with BuildSketch(Plane(origin=(0, 0, -48.768), x_dir=(-1, 0, 0), z_dir=(0, 0, -1)), mode=Mode.PRIVATE) as enl_v_mat_extru_9_sk1:
        with Locations((-12.855, -0.55)):
            Rectangle(ESQUISSE16_W, ESQUISSE16_H)
    enl_v_mat_extru_9_tool1 = extrude(enl_v_mat_extru_9_sk1.sketch, amount=-ENL_V_MAT_EXTRU_9_REACH, mode=Mode.PRIVATE) & part.part
    add(enl_v_mat_extru_9_tool1.solids().sort_by_distance((12.855, -0.55, -48.768))[0], mode=Mode.SUBTRACT)

    # Esquisse17 → Enlèv. mat.-Extru.10 (cut)
    with BuildSketch(Plane(origin=(0, 0, -48.768), x_dir=(-1, 0, 0), z_dir=(0, 0, -1))):
        with Locations((0, -0.4)):
            Rectangle(ESQUISSE17_W, ESQUISSE17_H)
    extrude(amount=-ENL_V_MAT_EXTRU_10_DEPTH, mode=Mode.SUBTRACT)

    # Esquisse18 → Boss.-Extru.1 (add)
    with BuildSketch(Plane(origin=(0, 0, -48.768), x_dir=(-1, 0, 0), z_dir=(0, 0, -1))):
        Polygon((-4.5, -0.8), (-5, -0.8), (-5, 0.5), (5, 0.5), (5, -0.8), (4.5, -0.8), (4.5, 0), (-4.5, 0), align=None)
    extrude(amount=BOSS_EXTRU_1_DEPTH)

    # Congé1
    cong_1_edges = [part.edges().sort_by_distance(p)[0] for p in [
        (-5, -0.15, -49.868),
        (0, 0.5, -49.868),
        (5, -0.15, -49.868),
    ]]
    fillet(cong_1_edges, radius=CONG_1_R)

    # Esquisse12 → Enlèv. mat.-Extru.5 (cut)
    with BuildSketch(Plane(origin=(0, 4.7874, 0), x_dir=(1, 0, 0), z_dir=(0, 1, 0))):
        with Locations((-0.285, -8.484)):
            Rectangle(ESQUISSE12_W, ESQUISSE12_H)
    extrude(amount=ENL_V_MAT_EXTRU_5_DEPTH, mode=Mode.SUBTRACT)

    # Congé2
    cong_2_edges = [part.edges().sort_by_distance(p)[0] for p in [
        (17.765, 6.19, 7.631),
        (0, 6.19, -11.768),
        (-17.765, 6.19, 7.631),
        (0, 6.19, 27.03),
    ]]
    fillet(cong_2_edges, radius=CONG_2_R)


solid = part.part
